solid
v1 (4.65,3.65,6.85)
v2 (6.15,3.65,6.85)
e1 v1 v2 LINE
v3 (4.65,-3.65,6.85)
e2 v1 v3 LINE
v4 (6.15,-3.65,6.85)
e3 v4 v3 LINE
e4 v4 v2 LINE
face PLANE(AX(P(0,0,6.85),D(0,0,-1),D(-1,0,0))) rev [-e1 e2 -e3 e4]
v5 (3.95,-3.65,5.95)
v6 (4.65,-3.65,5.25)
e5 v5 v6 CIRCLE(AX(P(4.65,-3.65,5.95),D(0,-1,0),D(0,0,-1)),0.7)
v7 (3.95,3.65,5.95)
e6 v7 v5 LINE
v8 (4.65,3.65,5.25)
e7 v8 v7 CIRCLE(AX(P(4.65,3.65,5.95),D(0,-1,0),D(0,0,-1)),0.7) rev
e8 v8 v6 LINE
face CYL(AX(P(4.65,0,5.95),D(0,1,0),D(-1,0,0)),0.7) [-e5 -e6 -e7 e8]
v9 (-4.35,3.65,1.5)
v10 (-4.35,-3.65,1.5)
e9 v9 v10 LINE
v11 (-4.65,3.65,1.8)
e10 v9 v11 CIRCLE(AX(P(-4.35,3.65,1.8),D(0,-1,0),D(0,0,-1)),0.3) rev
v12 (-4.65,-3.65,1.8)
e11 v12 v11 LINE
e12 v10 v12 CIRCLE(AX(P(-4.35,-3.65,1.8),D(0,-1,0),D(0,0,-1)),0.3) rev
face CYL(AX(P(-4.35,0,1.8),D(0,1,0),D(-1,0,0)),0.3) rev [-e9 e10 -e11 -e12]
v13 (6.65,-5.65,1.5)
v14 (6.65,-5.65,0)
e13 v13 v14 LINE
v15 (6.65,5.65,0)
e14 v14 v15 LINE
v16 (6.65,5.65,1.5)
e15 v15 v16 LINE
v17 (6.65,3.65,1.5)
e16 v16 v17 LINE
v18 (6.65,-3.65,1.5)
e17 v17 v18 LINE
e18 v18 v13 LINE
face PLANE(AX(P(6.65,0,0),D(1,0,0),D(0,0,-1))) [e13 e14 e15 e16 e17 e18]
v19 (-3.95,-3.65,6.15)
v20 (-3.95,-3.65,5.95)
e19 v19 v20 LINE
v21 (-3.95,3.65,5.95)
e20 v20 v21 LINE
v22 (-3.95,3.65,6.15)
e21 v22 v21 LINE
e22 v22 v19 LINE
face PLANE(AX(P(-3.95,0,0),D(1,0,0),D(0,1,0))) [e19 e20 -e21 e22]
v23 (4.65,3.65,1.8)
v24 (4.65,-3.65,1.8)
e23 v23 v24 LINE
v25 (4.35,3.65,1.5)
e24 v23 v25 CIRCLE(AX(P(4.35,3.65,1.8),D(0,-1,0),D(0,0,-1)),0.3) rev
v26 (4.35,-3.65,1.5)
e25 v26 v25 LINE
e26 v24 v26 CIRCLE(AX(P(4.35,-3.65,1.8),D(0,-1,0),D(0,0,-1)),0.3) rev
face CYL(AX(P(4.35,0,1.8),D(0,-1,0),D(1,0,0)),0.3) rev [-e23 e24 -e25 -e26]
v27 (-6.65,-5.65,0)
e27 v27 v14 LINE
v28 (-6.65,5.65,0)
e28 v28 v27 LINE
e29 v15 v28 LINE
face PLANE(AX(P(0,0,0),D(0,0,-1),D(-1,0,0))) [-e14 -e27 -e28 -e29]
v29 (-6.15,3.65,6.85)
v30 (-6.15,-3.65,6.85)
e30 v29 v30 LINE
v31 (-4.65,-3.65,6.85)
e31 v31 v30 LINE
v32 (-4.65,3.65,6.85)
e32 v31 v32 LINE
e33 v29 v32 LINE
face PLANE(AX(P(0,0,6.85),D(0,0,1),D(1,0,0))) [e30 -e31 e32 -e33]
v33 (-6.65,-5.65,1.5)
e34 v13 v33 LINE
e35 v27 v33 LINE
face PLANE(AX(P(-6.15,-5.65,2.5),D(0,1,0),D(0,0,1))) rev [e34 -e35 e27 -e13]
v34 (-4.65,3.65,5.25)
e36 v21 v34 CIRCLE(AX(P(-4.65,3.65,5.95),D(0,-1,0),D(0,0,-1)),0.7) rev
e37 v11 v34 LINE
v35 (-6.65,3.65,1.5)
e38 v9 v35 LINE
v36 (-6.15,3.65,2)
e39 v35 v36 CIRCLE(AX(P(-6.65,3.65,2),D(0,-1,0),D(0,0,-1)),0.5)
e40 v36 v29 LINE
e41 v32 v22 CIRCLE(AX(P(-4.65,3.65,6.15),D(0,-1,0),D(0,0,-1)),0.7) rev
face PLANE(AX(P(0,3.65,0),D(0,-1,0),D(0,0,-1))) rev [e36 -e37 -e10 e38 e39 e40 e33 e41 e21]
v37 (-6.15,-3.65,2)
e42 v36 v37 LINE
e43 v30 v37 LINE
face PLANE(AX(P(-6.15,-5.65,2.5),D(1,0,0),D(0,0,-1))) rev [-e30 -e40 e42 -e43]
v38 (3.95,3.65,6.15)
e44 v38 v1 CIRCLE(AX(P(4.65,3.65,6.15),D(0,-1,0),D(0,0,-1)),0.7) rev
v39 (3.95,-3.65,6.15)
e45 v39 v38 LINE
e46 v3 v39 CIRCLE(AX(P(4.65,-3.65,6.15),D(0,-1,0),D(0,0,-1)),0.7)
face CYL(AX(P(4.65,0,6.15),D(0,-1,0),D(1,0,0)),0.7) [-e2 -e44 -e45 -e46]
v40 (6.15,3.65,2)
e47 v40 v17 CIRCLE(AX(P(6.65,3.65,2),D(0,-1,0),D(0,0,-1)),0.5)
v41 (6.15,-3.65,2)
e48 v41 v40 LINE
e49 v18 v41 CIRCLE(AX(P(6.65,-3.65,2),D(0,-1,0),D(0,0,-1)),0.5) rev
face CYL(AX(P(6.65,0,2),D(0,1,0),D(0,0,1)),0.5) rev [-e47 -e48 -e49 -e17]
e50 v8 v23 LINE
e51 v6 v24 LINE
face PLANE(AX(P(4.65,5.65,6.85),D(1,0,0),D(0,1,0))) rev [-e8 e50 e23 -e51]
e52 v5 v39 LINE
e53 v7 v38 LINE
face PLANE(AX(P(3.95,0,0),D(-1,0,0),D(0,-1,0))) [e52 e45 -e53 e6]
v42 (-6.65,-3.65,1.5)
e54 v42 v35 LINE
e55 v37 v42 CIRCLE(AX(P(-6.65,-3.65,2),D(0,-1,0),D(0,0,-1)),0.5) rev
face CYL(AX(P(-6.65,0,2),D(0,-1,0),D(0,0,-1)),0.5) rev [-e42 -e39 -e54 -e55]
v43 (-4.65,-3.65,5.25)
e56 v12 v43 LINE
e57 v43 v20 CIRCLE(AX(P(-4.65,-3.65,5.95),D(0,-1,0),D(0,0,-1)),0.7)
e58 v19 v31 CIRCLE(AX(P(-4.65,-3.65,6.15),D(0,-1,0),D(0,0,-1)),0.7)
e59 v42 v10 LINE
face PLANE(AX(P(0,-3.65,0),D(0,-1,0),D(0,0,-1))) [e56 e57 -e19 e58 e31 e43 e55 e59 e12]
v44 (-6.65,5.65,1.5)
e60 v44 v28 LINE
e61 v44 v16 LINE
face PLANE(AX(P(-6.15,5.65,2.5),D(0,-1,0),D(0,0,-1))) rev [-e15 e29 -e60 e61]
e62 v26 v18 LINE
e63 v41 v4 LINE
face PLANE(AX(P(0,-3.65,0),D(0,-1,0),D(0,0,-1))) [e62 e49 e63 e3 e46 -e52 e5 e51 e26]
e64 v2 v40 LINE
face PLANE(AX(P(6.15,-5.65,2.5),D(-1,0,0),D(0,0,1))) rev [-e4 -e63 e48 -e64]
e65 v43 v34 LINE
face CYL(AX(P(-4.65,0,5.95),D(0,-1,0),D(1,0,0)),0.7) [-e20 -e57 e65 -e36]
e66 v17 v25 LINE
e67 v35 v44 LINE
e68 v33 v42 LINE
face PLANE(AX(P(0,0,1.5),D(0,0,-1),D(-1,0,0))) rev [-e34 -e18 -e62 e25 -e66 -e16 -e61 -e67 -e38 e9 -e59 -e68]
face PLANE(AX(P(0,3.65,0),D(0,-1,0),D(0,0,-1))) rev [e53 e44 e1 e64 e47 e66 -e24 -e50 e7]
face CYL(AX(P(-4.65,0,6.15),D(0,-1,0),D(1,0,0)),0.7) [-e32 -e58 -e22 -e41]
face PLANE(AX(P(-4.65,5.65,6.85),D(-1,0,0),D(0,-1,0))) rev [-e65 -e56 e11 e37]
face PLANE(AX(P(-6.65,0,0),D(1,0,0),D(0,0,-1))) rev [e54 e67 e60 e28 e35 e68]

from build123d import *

# Parameters (mm, degrees)
SKETCH_1_W          = 12.3
SKETCH_1_H          = 11.3
EXTRUDE_1_DEPTH     = 2.5
SKETCH_2_W          = 1.5
SKETCH_2_H          = 11.3
EXTRUDE_2_DEPTH     = 4.35
SKETCH_5_W          = 9.3
SKETCH_5_H          = 11.5
CUT_EXTRUDE_1_DEPTH = 1
SKETCH_8_W          = 1.6
SKETCH_8_H          = 11.3
EXTRUDE_5_DEPTH     = 0.7
SKETCH_9_W          = 1.6
SKETCH_9_H          = 11.3
EXTRUDE_6_DEPTH     = 0.7
FILLET_8_R          = 0.3
SKETCH_11_W         = 12.3
SKETCH_11_H         = 5.35
CUT_EXTRUDE_2_DEPTH = 2
SKETCH_12_W         = 12.3
SKETCH_12_H         = 5.35
CUT_EXTRUDE_3_DEPTH = 2
SKETCH_13_W         = 1.5
SKETCH_13_H         = 11.3
EXTRUDE_7_DEPTH     = 0.5
SKETCH_14_W         = 1.5
SKETCH_14_H         = 11.3
EXTRUDE_8_DEPTH     = 0.5
FILLET_9_R          = 0.5
FILLET_10_R         = 0.7


with BuildPart() as part:
    # 스케치1 → 보스-돌출1 (new body)
    with BuildSketch(Plane.XY):
        Rectangle(SKETCH_1_W, SKETCH_1_H)
    extrude(amount=EXTRUDE_1_DEPTH)

    # 스케치2 → 보스-돌출2 (add)
    with BuildSketch(Plane.XY.offset(2.5)):
        with Locations((-5.4, 0)):
            Rectangle(SKETCH_2_W, SKETCH_2_H)
        with Locations((5.4, 0)):
            Rectangle(SKETCH_2_W, SKETCH_2_H)
    extrude(amount=EXTRUDE_2_DEPTH)

    # 스케치5 → 컷-돌출1 (cut)
    with BuildSketch(Plane.XY.offset(2.5)):
        Rectangle(SKETCH_5_W, SKETCH_5_H)
    extrude(amount=-CUT_EXTRUDE_1_DEPTH, mode=Mode.SUBTRACT)

    # 스케치8 → 보스-돌출5 (add)
    with BuildSketch(Plane(origin=(-4.65, 0, 0), x_dir=(0, 0, -1), z_dir=(1, 0, 0))):
        with Locations((-6.05, 0)):
            Rectangle(SKETCH_8_W, SKETCH_8_H)
    extrude(amount=EXTRUDE_5_DEPTH)

    # 스케치9 → 보스-돌출6 (add)
    with BuildSketch(Plane.ZY.offset(-4.65)):
        with Locations((6.05, 0)):
            Rectangle(SKETCH_9_W, SKETCH_9_H)
    extrude(amount=EXTRUDE_6_DEPTH)

    # 필렛8
    fillet_8_edges = [part.edges().sort_by_distance(p)[0] for p in [
        (4.65, 0, 1.5),
        (-4.65, 0, 1.5),
    ]]
    fillet(fillet_8_edges, radius=FILLET_8_R)

    # 스케치11 → 컷-돌출2 (cut)
    with BuildSketch(Plane(origin=(0, 5.65, 0), x_dir=(1, 0, 0), z_dir=(0, 1, 0))):
        with Locations((0, -4.175)):
            Rectangle(SKETCH_11_W, SKETCH_11_H)
    extrude(amount=-CUT_EXTRUDE_2_DEPTH, mode=Mode.SUBTRACT)

    # 스케치12 → 컷-돌출3 (cut)
    with BuildSketch(Plane.XZ.offset(5.65)):
        with Locations((0, 4.175)):
            Rectangle(SKETCH_12_W, SKETCH_12_H)
    extrude(amount=-CUT_EXTRUDE_3_DEPTH, mode=Mode.SUBTRACT)

    # 스케치13 → 보스-돌출7 (add)
    with BuildSketch(Plane(origin=(6.15, 0, 0), x_dir=(0, 0, -1), z_dir=(1, 0, 0))):
        with Locations((-0.75, 0)):
            Rectangle(SKETCH_13_W, SKETCH_13_H)
    extrude(amount=EXTRUDE_7_DEPTH)

    # 스케치14 → 보스-돌출8 (add)
    with BuildSketch(Plane.ZY.offset(6.15)):
        with Locations((0.75, 0)):
            Rectangle(SKETCH_14_W, SKETCH_14_H)
    extrude(amount=EXTRUDE_8_DEPTH)

    # 필렛9
    fillet_9_edges = [part.edges().sort_by_distance(p)[0] for p in [
        (6.15, 0, 1.5),
        (-6.15, 0, 1.5),
    ]]
    fillet(fillet_9_edges, radius=FILLET_9_R - 0.0001)  # a hair under: the kernel refuses the full size

    # 필렛10
    fillet_10_edges = [part.edges().sort_by_distance(p)[0] for p in [
        (-3.95, 0, 6.85),
        (-3.95, 0, 5.25),
        (3.95, 0, 5.25),
        (3.95, 0, 6.85),
    ]]
    fillet(fillet_10_edges, radius=FILLET_10_R - 0.0001)  # a hair under: the kernel refuses the full size


solid = part.part
